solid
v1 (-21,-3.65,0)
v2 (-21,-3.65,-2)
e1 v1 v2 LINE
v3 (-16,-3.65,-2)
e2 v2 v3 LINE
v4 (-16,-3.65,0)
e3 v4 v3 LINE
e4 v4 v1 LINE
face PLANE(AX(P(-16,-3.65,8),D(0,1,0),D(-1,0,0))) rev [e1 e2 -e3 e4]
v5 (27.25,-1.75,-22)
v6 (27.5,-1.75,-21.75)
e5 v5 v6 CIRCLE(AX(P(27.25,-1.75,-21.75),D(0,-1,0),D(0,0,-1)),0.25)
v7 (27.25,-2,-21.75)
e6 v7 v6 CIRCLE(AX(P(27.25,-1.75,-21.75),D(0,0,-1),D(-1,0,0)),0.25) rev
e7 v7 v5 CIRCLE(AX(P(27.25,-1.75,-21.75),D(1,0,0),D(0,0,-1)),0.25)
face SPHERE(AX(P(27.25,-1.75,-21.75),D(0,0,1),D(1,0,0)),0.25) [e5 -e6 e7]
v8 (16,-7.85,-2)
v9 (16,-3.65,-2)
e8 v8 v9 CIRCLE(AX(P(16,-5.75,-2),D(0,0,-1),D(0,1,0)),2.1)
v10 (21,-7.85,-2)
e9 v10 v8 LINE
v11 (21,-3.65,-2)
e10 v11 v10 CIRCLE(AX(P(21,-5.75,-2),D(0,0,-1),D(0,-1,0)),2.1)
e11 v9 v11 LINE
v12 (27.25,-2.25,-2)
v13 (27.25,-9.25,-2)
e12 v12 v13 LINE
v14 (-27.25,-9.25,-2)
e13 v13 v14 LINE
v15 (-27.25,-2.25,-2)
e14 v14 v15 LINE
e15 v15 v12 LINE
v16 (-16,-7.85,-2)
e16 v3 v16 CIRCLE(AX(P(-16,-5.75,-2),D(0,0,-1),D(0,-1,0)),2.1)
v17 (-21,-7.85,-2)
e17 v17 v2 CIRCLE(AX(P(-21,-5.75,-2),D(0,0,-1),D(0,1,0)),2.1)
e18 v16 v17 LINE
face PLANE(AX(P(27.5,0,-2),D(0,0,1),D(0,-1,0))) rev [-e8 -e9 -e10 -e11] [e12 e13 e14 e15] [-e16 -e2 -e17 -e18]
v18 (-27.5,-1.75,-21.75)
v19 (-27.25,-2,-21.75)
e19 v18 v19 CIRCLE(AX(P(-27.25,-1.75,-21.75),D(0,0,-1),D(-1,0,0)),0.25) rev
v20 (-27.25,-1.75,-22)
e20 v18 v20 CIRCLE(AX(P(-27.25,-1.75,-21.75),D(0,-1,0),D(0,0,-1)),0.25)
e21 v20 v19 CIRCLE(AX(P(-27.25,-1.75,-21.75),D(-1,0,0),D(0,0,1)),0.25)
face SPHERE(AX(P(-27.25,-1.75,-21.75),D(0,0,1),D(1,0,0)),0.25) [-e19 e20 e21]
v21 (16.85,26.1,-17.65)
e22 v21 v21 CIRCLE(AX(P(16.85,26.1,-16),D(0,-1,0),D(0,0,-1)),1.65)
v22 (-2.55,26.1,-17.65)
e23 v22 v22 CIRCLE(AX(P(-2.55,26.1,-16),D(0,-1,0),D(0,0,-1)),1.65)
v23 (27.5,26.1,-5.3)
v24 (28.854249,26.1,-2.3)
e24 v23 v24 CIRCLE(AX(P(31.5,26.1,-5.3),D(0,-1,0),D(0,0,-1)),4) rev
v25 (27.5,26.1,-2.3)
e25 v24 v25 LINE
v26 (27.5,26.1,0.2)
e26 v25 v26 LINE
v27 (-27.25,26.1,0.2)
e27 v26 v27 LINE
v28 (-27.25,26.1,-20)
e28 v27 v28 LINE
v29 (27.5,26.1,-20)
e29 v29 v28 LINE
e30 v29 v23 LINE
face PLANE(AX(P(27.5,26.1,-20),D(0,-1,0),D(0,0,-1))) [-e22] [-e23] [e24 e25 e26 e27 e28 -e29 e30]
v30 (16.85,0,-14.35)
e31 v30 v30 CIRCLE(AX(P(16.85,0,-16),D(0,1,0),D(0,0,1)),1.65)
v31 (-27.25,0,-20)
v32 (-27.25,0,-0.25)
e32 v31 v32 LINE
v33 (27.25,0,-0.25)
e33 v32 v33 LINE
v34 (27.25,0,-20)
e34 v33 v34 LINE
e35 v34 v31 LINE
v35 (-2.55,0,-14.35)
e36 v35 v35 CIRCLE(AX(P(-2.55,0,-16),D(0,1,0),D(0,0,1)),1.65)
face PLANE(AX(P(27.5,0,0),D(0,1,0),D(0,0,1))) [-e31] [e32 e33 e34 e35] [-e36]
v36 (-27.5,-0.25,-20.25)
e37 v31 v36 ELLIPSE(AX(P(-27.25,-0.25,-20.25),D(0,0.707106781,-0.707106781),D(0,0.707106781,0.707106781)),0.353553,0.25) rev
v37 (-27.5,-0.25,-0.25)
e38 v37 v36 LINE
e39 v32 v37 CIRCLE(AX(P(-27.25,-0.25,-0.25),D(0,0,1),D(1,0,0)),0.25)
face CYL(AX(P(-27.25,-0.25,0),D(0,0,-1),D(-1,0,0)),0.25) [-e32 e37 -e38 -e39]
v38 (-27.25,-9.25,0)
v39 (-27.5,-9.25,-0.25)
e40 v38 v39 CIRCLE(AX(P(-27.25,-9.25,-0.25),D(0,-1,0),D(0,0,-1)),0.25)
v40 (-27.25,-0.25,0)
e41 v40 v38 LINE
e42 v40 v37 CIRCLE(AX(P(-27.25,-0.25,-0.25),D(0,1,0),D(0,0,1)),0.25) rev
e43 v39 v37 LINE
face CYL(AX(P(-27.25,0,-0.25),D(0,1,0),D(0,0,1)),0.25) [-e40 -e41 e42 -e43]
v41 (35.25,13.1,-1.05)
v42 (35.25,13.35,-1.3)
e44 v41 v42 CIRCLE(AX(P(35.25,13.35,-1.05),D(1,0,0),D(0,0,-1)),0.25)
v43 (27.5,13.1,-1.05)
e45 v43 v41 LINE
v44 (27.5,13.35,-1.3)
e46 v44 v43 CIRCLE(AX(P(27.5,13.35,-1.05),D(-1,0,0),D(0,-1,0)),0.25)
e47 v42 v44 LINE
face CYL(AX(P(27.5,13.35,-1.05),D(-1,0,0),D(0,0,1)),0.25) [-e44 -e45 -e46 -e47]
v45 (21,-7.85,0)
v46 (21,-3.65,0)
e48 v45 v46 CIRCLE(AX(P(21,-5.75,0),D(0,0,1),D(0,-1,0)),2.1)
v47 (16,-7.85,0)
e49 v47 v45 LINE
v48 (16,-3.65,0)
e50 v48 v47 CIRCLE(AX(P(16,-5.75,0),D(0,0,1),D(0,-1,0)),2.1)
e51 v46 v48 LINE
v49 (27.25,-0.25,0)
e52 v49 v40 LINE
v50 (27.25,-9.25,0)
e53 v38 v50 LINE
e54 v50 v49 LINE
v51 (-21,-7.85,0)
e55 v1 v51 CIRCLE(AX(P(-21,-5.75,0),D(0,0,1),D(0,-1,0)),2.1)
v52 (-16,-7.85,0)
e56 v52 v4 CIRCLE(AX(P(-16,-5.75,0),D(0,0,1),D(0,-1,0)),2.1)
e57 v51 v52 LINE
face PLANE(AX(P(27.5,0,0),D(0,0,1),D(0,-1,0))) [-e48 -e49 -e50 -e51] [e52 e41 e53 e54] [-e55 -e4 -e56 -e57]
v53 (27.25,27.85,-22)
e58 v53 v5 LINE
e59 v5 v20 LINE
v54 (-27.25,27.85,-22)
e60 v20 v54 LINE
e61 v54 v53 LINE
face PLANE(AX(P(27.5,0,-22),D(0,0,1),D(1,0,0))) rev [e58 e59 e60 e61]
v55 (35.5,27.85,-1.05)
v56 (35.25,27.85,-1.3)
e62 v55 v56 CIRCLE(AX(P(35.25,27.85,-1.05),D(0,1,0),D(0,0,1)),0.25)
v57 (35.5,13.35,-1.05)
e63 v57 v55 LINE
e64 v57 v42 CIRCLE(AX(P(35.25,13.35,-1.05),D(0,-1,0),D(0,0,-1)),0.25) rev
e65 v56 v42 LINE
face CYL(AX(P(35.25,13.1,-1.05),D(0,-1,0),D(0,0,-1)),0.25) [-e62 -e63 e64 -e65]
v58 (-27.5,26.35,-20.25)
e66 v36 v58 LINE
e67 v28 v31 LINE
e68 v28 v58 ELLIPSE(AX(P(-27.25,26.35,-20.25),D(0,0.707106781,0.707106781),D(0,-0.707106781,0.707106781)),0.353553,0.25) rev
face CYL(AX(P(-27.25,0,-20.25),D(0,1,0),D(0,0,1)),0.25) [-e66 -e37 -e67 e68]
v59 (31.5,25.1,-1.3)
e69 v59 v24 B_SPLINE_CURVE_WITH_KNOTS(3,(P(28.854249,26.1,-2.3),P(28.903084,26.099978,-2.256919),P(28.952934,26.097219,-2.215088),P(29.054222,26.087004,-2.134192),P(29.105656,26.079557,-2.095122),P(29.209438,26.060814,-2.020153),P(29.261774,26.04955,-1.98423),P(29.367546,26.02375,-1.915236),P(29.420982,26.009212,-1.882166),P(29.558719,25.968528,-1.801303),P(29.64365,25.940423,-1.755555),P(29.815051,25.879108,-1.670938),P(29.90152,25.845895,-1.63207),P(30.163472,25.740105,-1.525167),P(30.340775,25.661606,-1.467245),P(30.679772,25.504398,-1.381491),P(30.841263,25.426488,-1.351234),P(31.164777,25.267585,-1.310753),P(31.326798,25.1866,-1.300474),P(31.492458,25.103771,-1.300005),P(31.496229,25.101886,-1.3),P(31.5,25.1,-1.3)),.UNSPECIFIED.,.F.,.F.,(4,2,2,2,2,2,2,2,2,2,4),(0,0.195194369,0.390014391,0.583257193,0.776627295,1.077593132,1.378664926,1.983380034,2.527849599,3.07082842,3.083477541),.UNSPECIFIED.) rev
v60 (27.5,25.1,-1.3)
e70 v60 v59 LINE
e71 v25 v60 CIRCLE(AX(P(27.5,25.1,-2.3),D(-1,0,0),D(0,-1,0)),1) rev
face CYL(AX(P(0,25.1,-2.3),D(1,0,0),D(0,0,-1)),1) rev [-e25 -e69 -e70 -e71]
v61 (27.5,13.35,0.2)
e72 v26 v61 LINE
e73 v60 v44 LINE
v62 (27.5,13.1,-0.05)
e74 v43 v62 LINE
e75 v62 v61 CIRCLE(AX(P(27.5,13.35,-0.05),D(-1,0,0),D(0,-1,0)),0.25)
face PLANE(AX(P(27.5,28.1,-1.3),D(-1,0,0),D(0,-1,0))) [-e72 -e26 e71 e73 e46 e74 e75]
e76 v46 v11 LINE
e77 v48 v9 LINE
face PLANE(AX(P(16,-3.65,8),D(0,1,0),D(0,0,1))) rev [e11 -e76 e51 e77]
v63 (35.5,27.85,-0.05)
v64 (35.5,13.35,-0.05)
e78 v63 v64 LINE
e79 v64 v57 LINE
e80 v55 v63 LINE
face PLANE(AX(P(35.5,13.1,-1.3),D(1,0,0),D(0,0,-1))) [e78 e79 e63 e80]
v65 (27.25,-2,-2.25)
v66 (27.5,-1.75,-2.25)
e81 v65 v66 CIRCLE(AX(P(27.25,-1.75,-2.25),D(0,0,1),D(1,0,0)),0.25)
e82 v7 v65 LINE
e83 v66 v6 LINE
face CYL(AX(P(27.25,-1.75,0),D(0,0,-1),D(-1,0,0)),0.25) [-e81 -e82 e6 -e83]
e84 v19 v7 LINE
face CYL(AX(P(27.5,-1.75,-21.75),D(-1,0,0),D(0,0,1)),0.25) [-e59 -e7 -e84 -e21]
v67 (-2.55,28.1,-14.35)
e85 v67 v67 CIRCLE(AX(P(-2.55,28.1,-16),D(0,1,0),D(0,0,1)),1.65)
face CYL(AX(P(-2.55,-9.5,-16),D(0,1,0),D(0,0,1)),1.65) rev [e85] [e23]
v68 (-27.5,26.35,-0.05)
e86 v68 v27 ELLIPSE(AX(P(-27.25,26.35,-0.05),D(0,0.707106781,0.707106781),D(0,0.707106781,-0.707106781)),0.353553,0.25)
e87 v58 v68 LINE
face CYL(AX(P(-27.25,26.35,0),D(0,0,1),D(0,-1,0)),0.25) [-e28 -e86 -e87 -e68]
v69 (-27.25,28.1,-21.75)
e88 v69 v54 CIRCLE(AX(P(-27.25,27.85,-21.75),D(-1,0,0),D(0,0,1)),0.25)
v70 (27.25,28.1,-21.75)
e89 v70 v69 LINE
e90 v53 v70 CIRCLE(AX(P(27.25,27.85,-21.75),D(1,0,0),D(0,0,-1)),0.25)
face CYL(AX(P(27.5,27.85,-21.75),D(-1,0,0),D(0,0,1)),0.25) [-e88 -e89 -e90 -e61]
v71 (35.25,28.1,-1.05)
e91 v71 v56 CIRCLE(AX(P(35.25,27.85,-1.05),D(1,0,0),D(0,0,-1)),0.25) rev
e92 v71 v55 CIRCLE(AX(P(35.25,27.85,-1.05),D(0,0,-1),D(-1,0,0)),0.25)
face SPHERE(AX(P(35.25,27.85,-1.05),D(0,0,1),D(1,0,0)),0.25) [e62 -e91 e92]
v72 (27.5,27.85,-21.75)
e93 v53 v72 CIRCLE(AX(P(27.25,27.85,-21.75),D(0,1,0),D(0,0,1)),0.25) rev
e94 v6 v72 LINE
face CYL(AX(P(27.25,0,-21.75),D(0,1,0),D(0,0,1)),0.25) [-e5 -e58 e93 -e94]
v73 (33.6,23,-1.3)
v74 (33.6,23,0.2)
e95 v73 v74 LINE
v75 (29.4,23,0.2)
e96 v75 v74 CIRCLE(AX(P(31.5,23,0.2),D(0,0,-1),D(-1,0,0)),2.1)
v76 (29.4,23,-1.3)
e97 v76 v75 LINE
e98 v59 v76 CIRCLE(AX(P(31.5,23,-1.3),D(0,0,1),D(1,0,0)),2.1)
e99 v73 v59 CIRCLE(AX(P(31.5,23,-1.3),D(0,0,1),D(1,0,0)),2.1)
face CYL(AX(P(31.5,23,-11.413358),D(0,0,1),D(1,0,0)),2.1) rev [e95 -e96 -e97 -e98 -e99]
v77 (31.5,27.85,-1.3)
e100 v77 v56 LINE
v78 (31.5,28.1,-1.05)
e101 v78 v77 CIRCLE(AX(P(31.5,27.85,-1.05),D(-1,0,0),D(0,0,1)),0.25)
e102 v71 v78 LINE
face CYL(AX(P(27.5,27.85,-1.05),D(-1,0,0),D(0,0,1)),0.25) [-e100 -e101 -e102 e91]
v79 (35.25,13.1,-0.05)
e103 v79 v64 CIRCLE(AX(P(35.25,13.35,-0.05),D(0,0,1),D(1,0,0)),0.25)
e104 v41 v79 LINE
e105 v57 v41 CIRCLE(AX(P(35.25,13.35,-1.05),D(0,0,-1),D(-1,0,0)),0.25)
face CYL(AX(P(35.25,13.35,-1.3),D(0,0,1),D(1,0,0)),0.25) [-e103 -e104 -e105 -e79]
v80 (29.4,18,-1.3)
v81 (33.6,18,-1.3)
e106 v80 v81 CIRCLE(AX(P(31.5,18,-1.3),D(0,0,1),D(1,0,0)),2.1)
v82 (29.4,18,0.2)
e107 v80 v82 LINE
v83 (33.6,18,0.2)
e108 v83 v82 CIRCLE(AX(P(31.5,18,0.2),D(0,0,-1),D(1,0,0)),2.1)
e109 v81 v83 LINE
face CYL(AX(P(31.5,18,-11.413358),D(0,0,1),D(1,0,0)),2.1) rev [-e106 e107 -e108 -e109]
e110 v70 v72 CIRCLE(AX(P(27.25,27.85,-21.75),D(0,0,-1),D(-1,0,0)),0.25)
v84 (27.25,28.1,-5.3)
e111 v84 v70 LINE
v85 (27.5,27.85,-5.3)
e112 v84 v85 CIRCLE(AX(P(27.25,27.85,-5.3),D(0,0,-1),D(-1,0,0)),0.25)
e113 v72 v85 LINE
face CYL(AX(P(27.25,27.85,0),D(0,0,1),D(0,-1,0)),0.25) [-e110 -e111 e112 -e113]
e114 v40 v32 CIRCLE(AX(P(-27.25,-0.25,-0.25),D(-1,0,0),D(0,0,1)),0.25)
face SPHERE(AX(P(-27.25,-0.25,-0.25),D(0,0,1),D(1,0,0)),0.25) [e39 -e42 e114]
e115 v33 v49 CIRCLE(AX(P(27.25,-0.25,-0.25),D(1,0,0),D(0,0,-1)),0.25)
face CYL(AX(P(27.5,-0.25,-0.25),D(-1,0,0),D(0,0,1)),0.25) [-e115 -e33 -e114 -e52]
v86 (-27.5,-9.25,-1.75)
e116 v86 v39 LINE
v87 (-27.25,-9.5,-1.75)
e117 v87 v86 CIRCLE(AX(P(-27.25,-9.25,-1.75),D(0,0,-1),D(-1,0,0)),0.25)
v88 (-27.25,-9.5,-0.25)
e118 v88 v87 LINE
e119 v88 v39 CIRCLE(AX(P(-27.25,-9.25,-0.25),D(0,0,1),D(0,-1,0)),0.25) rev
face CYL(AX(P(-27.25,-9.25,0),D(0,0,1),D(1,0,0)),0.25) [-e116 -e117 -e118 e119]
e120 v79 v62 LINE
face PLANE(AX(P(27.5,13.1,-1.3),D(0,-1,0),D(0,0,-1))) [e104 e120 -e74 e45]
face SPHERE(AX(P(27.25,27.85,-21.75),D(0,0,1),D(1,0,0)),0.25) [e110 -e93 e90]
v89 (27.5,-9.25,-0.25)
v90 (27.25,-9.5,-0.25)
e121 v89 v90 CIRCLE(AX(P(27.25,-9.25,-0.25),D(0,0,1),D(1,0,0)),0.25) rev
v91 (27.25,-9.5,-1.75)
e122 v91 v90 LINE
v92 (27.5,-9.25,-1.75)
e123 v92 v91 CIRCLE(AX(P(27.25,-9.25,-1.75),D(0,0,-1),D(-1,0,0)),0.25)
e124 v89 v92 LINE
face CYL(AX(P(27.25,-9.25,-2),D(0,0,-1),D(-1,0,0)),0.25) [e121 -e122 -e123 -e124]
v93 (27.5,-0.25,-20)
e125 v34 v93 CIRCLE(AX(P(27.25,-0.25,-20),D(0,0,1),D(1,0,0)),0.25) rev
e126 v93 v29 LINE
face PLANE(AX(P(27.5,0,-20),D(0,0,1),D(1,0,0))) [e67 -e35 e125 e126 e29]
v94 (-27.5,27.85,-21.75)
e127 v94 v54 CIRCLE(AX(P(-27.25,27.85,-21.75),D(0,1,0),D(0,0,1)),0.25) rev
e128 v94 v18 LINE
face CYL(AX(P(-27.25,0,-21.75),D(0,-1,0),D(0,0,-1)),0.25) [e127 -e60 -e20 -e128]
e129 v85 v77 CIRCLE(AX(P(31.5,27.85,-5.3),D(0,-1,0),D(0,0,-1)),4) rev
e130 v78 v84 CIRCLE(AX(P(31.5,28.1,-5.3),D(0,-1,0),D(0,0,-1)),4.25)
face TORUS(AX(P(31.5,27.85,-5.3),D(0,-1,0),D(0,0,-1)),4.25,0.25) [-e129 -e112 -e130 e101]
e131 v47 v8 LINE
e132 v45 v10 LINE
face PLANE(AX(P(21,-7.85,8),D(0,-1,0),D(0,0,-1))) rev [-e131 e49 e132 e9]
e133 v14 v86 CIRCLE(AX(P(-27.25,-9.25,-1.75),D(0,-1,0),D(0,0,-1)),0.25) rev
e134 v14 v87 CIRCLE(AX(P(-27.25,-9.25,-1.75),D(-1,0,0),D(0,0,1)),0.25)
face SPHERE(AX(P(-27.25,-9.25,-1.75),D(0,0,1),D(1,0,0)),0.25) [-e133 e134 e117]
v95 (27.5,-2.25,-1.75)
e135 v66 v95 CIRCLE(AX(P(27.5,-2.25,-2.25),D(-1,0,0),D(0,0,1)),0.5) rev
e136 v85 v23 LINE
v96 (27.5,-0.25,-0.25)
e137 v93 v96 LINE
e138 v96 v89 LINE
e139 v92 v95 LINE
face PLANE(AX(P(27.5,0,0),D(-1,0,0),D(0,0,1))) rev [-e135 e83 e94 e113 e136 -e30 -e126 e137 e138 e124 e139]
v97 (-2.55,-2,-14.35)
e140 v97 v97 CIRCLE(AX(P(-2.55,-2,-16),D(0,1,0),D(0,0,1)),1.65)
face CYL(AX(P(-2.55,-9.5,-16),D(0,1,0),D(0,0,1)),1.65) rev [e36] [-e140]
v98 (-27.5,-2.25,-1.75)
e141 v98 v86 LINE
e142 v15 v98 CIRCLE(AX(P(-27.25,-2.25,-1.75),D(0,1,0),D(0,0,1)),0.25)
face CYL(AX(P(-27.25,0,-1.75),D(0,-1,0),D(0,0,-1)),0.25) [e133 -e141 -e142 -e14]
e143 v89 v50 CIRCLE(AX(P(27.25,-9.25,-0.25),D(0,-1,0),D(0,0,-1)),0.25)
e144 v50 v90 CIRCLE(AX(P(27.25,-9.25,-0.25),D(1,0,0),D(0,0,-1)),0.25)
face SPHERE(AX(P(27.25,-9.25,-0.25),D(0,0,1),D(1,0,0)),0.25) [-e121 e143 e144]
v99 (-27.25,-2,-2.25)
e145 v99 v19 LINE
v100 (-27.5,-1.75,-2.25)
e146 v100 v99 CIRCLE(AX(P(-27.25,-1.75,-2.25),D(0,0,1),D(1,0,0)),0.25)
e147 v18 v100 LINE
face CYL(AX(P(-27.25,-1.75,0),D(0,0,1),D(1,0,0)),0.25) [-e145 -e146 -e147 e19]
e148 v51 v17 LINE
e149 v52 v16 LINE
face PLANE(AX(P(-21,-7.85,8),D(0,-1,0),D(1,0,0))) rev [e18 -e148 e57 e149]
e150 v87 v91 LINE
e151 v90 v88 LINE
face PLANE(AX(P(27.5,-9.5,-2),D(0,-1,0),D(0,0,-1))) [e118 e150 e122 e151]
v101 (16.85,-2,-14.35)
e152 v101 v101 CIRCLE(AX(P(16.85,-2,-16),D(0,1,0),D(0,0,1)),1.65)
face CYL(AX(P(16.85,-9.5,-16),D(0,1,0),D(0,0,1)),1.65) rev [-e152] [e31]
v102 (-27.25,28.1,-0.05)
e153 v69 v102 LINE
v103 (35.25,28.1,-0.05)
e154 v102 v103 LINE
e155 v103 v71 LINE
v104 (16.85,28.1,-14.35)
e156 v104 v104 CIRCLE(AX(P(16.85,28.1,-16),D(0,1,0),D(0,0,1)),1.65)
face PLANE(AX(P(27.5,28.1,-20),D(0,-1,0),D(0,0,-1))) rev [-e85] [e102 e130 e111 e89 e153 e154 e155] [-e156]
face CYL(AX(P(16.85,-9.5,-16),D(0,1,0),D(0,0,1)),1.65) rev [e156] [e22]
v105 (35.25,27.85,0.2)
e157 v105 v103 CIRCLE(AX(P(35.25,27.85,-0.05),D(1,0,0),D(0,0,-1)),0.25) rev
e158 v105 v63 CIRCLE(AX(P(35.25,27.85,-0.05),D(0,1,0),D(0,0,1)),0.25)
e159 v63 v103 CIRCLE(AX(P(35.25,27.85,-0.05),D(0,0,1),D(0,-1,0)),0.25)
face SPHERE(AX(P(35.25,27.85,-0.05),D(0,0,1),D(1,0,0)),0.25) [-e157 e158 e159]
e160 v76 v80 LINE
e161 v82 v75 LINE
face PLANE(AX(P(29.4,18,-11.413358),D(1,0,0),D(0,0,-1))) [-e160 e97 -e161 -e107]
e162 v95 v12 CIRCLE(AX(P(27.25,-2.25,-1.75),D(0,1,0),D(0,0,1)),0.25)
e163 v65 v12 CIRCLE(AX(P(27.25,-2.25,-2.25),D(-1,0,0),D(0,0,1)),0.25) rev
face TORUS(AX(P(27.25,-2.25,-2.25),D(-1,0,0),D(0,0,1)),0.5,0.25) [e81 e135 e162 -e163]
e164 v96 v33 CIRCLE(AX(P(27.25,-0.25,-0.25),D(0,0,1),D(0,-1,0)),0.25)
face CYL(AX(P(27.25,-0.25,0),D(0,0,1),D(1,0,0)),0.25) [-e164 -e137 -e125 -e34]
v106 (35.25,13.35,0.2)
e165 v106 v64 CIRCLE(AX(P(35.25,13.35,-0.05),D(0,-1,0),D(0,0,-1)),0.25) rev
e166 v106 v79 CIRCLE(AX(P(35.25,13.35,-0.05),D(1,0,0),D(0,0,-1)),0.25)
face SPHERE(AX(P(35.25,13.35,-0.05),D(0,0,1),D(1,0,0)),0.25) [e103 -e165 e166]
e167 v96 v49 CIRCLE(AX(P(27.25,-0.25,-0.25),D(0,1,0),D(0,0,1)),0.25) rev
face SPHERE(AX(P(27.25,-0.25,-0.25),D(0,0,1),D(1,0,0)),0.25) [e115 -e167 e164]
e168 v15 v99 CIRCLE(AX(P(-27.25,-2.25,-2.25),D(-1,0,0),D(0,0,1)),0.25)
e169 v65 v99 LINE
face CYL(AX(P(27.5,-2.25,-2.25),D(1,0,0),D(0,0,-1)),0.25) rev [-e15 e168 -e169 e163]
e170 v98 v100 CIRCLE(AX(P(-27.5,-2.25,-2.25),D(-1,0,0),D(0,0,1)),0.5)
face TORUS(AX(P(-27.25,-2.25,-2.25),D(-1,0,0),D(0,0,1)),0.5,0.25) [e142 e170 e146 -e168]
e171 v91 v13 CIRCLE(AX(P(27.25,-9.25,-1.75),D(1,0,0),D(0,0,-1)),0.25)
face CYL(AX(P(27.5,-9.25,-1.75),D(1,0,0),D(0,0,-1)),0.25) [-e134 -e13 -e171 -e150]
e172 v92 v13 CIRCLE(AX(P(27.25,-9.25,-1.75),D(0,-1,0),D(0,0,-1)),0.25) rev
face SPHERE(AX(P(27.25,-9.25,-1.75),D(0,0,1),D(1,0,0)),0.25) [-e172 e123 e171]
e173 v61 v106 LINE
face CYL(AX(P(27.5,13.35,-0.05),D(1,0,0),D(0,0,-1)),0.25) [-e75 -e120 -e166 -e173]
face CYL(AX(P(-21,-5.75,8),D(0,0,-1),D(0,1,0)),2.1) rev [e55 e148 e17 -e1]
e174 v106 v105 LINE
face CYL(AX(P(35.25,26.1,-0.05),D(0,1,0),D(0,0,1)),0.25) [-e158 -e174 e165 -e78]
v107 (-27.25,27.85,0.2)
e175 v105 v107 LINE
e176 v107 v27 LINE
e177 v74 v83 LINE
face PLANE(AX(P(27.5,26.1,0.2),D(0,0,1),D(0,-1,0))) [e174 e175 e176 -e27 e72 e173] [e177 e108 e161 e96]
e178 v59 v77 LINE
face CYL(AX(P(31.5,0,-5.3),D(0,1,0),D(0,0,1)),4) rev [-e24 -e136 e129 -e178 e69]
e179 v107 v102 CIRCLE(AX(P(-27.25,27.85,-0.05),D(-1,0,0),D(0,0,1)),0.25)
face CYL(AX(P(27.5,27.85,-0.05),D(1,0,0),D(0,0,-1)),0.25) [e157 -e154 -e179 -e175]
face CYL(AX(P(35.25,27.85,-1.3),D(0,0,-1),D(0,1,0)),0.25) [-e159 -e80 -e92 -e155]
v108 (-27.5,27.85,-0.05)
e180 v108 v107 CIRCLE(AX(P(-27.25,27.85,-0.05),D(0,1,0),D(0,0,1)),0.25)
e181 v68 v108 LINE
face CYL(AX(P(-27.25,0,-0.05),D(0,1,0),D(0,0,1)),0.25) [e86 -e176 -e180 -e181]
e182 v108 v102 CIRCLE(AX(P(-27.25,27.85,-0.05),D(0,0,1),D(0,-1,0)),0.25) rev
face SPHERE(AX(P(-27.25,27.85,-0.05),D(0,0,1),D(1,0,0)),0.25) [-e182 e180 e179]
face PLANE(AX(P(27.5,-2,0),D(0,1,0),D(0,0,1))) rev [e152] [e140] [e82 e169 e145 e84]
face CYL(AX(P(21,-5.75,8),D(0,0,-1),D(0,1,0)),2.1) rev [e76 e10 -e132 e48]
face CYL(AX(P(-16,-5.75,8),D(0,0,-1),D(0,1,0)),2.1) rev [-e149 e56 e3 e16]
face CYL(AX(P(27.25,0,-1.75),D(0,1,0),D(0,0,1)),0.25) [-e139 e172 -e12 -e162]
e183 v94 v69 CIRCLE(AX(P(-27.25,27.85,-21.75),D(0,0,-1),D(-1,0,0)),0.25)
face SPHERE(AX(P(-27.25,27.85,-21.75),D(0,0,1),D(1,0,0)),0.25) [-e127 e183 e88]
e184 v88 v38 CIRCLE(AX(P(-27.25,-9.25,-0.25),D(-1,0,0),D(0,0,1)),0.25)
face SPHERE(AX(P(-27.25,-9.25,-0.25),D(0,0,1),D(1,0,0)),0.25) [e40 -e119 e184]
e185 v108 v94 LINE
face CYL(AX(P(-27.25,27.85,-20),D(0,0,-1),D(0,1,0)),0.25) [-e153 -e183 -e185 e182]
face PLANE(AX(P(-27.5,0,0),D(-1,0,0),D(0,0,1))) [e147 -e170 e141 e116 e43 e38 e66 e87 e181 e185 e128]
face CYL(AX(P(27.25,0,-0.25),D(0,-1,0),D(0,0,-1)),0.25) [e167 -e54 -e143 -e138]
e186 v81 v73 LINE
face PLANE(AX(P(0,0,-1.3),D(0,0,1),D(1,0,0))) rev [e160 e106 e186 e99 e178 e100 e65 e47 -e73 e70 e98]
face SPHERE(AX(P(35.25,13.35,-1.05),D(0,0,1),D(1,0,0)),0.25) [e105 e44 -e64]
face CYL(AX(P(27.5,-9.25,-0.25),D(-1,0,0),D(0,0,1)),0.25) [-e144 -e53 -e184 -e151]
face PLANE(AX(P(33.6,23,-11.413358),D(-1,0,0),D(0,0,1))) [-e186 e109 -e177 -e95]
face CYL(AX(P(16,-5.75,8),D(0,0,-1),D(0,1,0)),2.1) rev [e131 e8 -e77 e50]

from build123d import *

# Parameters (mm, degrees)
EXTRUDE_THIN2_DEPTH     = 27.5
CUT_EXTRUDE4_DEPTH      = 46.053967639
CUT_EXTRUDE4_DEPTH_BACK = 46.053967639
SKETCH6_R               = 1.65
SKETCH8_W               = 8
SKETCH8_H               = 15
BOSS_EXTRUDE1_DEPTH     = 1.5
CUT_EXTRUDE5_DEPTH      = 1.5
FILLET2_R               = 4
FILLET3_R               = 0.25
CUT_EXTRUDE7_DEPTH      = 10
FILLET5_R               = 1


with BuildPart() as part:
    # Sketch1 → Extrude-Thin2 (new, symmetric)
    with BuildSketch(Plane(origin=(0, 0, 0), x_dir=(0, 0, -1), z_dir=(1, 0, 0))):
        Polygon((-0.2, 26.1), (20, 26.1), (20, 0), (0, 0), (0, -9.5), (2, -9.5), (2, -2), (22, -2), (22, 28.1), (-0.2, 28.1), align=None)
    extrude(amount=EXTRUDE_THIN2_DEPTH, both=True)

    # Sketch6 → Cut-Extrude4 (cut, two sides: drawn at the far end of the back side and taken through both)
    with BuildSketch(Plane(origin=(0, 0, 0), x_dir=(1, 0, 0), z_dir=(0, 1, 0)).offset(-CUT_EXTRUDE4_DEPTH_BACK)):
        with Locations(Location((-2.55, 16, 0), (0, 0, 270))):
            Circle(SKETCH6_R)
        with Locations(Location((16.85, 16, 0), (0, 0, 270))):
            Circle(SKETCH6_R)
    extrude(amount=CUT_EXTRUDE4_DEPTH + CUT_EXTRUDE4_DEPTH_BACK, mode=Mode.SUBTRACT)

    # Sketch8 → Boss-Extrude1 (add)
    with BuildSketch(Plane.XY.offset(0.2)):
        with Locations((31.5, 20.6)):
            Rectangle(SKETCH8_W, SKETCH8_H)
    extrude(amount=-BOSS_EXTRUDE1_DEPTH)

    # Sketch9 → Cut-Extrude5 (cut)
    with BuildSketch(Plane(origin=(0, 0, 0.2), x_dir=(-1, 0, 0), z_dir=(0, 0, -1))):
        with BuildLine():
            Line((-29.4, 18), (-29.4, 23))
            ThreePointArc((-29.4, 23), (-31.5, 25.1), (-33.6, 23))
            Line((-33.6, 23), (-33.6, 18))
            ThreePointArc((-33.6, 18), (-31.5, 15.9), (-29.4, 18))
        make_face()
    extrude(amount=CUT_EXTRUDE5_DEPTH, mode=Mode.SUBTRACT)

    # Fillet2
    fillet2_edges = [part.edges().sort_by_distance(p)[0] for p in [
        (27.5, 27.1, -1.3),
    ]]
    fillet(fillet2_edges, radius=FILLET2_R)

    # Fillet3
    fillet3_edges = [part.edges().sort_by_distance(p)[0] for p in [
        (-27.5, -4.75, 0),
        (-27.5, 0, -10),
        (-27.5, 13.05, -20),
        (-27.5, 26.1, -9.9),
        (-27.5, 27.1, 0.2),
        (-27.5, 28.1, -10.9),
        (0, 28.1, -22),
        (0, -2, -22),
        (0, -2, -2),
        (0, -9.5, -2),
        (0, -9.5, 0),
        (0, 0, 0),
        (4, 28.1, 0.2),
        (27.5, 0, -10),
        (27.5, -4.75, 0),
        (27.5, -9.5, -1),
        (27.5, -5.75, -2),
        (27.5, -2, -12),
        (27.5, 13.05, -22),
        (33.5, 28.1, -1.3),
        (35.5, 20.6, -1.3),
        (35.5, 28.1, -0.55),
        (31.5, 13.1, -1.3),
        (35.5, 13.1, -0.55),
        (31.5, 13.1, 0.2),
        (35.5, 20.6, 0.2),
        (27.5, 28.1, -13.65),
        (28.671572875, 28.1, -2.471572875),
        (-27.5, 13.05, -22),
        (-27.5, -2, -12),
        (-27.5, -5.75, -2),
        (-27.5, -9.5, -1),
    ]]
    fillet(fillet3_edges, radius=FILLET3_R)

    # Sketch11 → Cut-Extrude7 (cut)
    with BuildSketch(Plane(origin=(0, 0, -2), x_dir=(-1, 0, 0), z_dir=(0, 0, -1))):
        with BuildLine():
            Line((-21, -7.85), (-16, -7.85))
            ThreePointArc((-16, -7.85), (-13.9, -5.75), (-16, -3.65))
            Line((-16, -3.65), (-21, -3.65))
            ThreePointArc((-21, -3.65), (-23.1, -5.75), (-21, -7.85))
        make_face()
        with BuildLine():
            Line((16, -3.65), (21, -3.65))
            ThreePointArc((21, -3.65), (23.1, -5.75), (21, -7.85))
            Line((21, -7.85), (16, -7.85))
            ThreePointArc((16, -7.85), (13.9, -5.75), (16, -3.65))
        make_face()
    extrude(amount=-CUT_EXTRUDE7_DEPTH, mode=Mode.SUBTRACT)

    # Fillet5
    fillet5_edges = [part.edges().sort_by_distance(p)[0] for p in [
        (29.5, 26.1, -1.3),
    ]]
    fillet(fillet5_edges, radius=FILLET5_R - 0.0001)  # a hair under: the kernel refuses the full size


solid = part.part
